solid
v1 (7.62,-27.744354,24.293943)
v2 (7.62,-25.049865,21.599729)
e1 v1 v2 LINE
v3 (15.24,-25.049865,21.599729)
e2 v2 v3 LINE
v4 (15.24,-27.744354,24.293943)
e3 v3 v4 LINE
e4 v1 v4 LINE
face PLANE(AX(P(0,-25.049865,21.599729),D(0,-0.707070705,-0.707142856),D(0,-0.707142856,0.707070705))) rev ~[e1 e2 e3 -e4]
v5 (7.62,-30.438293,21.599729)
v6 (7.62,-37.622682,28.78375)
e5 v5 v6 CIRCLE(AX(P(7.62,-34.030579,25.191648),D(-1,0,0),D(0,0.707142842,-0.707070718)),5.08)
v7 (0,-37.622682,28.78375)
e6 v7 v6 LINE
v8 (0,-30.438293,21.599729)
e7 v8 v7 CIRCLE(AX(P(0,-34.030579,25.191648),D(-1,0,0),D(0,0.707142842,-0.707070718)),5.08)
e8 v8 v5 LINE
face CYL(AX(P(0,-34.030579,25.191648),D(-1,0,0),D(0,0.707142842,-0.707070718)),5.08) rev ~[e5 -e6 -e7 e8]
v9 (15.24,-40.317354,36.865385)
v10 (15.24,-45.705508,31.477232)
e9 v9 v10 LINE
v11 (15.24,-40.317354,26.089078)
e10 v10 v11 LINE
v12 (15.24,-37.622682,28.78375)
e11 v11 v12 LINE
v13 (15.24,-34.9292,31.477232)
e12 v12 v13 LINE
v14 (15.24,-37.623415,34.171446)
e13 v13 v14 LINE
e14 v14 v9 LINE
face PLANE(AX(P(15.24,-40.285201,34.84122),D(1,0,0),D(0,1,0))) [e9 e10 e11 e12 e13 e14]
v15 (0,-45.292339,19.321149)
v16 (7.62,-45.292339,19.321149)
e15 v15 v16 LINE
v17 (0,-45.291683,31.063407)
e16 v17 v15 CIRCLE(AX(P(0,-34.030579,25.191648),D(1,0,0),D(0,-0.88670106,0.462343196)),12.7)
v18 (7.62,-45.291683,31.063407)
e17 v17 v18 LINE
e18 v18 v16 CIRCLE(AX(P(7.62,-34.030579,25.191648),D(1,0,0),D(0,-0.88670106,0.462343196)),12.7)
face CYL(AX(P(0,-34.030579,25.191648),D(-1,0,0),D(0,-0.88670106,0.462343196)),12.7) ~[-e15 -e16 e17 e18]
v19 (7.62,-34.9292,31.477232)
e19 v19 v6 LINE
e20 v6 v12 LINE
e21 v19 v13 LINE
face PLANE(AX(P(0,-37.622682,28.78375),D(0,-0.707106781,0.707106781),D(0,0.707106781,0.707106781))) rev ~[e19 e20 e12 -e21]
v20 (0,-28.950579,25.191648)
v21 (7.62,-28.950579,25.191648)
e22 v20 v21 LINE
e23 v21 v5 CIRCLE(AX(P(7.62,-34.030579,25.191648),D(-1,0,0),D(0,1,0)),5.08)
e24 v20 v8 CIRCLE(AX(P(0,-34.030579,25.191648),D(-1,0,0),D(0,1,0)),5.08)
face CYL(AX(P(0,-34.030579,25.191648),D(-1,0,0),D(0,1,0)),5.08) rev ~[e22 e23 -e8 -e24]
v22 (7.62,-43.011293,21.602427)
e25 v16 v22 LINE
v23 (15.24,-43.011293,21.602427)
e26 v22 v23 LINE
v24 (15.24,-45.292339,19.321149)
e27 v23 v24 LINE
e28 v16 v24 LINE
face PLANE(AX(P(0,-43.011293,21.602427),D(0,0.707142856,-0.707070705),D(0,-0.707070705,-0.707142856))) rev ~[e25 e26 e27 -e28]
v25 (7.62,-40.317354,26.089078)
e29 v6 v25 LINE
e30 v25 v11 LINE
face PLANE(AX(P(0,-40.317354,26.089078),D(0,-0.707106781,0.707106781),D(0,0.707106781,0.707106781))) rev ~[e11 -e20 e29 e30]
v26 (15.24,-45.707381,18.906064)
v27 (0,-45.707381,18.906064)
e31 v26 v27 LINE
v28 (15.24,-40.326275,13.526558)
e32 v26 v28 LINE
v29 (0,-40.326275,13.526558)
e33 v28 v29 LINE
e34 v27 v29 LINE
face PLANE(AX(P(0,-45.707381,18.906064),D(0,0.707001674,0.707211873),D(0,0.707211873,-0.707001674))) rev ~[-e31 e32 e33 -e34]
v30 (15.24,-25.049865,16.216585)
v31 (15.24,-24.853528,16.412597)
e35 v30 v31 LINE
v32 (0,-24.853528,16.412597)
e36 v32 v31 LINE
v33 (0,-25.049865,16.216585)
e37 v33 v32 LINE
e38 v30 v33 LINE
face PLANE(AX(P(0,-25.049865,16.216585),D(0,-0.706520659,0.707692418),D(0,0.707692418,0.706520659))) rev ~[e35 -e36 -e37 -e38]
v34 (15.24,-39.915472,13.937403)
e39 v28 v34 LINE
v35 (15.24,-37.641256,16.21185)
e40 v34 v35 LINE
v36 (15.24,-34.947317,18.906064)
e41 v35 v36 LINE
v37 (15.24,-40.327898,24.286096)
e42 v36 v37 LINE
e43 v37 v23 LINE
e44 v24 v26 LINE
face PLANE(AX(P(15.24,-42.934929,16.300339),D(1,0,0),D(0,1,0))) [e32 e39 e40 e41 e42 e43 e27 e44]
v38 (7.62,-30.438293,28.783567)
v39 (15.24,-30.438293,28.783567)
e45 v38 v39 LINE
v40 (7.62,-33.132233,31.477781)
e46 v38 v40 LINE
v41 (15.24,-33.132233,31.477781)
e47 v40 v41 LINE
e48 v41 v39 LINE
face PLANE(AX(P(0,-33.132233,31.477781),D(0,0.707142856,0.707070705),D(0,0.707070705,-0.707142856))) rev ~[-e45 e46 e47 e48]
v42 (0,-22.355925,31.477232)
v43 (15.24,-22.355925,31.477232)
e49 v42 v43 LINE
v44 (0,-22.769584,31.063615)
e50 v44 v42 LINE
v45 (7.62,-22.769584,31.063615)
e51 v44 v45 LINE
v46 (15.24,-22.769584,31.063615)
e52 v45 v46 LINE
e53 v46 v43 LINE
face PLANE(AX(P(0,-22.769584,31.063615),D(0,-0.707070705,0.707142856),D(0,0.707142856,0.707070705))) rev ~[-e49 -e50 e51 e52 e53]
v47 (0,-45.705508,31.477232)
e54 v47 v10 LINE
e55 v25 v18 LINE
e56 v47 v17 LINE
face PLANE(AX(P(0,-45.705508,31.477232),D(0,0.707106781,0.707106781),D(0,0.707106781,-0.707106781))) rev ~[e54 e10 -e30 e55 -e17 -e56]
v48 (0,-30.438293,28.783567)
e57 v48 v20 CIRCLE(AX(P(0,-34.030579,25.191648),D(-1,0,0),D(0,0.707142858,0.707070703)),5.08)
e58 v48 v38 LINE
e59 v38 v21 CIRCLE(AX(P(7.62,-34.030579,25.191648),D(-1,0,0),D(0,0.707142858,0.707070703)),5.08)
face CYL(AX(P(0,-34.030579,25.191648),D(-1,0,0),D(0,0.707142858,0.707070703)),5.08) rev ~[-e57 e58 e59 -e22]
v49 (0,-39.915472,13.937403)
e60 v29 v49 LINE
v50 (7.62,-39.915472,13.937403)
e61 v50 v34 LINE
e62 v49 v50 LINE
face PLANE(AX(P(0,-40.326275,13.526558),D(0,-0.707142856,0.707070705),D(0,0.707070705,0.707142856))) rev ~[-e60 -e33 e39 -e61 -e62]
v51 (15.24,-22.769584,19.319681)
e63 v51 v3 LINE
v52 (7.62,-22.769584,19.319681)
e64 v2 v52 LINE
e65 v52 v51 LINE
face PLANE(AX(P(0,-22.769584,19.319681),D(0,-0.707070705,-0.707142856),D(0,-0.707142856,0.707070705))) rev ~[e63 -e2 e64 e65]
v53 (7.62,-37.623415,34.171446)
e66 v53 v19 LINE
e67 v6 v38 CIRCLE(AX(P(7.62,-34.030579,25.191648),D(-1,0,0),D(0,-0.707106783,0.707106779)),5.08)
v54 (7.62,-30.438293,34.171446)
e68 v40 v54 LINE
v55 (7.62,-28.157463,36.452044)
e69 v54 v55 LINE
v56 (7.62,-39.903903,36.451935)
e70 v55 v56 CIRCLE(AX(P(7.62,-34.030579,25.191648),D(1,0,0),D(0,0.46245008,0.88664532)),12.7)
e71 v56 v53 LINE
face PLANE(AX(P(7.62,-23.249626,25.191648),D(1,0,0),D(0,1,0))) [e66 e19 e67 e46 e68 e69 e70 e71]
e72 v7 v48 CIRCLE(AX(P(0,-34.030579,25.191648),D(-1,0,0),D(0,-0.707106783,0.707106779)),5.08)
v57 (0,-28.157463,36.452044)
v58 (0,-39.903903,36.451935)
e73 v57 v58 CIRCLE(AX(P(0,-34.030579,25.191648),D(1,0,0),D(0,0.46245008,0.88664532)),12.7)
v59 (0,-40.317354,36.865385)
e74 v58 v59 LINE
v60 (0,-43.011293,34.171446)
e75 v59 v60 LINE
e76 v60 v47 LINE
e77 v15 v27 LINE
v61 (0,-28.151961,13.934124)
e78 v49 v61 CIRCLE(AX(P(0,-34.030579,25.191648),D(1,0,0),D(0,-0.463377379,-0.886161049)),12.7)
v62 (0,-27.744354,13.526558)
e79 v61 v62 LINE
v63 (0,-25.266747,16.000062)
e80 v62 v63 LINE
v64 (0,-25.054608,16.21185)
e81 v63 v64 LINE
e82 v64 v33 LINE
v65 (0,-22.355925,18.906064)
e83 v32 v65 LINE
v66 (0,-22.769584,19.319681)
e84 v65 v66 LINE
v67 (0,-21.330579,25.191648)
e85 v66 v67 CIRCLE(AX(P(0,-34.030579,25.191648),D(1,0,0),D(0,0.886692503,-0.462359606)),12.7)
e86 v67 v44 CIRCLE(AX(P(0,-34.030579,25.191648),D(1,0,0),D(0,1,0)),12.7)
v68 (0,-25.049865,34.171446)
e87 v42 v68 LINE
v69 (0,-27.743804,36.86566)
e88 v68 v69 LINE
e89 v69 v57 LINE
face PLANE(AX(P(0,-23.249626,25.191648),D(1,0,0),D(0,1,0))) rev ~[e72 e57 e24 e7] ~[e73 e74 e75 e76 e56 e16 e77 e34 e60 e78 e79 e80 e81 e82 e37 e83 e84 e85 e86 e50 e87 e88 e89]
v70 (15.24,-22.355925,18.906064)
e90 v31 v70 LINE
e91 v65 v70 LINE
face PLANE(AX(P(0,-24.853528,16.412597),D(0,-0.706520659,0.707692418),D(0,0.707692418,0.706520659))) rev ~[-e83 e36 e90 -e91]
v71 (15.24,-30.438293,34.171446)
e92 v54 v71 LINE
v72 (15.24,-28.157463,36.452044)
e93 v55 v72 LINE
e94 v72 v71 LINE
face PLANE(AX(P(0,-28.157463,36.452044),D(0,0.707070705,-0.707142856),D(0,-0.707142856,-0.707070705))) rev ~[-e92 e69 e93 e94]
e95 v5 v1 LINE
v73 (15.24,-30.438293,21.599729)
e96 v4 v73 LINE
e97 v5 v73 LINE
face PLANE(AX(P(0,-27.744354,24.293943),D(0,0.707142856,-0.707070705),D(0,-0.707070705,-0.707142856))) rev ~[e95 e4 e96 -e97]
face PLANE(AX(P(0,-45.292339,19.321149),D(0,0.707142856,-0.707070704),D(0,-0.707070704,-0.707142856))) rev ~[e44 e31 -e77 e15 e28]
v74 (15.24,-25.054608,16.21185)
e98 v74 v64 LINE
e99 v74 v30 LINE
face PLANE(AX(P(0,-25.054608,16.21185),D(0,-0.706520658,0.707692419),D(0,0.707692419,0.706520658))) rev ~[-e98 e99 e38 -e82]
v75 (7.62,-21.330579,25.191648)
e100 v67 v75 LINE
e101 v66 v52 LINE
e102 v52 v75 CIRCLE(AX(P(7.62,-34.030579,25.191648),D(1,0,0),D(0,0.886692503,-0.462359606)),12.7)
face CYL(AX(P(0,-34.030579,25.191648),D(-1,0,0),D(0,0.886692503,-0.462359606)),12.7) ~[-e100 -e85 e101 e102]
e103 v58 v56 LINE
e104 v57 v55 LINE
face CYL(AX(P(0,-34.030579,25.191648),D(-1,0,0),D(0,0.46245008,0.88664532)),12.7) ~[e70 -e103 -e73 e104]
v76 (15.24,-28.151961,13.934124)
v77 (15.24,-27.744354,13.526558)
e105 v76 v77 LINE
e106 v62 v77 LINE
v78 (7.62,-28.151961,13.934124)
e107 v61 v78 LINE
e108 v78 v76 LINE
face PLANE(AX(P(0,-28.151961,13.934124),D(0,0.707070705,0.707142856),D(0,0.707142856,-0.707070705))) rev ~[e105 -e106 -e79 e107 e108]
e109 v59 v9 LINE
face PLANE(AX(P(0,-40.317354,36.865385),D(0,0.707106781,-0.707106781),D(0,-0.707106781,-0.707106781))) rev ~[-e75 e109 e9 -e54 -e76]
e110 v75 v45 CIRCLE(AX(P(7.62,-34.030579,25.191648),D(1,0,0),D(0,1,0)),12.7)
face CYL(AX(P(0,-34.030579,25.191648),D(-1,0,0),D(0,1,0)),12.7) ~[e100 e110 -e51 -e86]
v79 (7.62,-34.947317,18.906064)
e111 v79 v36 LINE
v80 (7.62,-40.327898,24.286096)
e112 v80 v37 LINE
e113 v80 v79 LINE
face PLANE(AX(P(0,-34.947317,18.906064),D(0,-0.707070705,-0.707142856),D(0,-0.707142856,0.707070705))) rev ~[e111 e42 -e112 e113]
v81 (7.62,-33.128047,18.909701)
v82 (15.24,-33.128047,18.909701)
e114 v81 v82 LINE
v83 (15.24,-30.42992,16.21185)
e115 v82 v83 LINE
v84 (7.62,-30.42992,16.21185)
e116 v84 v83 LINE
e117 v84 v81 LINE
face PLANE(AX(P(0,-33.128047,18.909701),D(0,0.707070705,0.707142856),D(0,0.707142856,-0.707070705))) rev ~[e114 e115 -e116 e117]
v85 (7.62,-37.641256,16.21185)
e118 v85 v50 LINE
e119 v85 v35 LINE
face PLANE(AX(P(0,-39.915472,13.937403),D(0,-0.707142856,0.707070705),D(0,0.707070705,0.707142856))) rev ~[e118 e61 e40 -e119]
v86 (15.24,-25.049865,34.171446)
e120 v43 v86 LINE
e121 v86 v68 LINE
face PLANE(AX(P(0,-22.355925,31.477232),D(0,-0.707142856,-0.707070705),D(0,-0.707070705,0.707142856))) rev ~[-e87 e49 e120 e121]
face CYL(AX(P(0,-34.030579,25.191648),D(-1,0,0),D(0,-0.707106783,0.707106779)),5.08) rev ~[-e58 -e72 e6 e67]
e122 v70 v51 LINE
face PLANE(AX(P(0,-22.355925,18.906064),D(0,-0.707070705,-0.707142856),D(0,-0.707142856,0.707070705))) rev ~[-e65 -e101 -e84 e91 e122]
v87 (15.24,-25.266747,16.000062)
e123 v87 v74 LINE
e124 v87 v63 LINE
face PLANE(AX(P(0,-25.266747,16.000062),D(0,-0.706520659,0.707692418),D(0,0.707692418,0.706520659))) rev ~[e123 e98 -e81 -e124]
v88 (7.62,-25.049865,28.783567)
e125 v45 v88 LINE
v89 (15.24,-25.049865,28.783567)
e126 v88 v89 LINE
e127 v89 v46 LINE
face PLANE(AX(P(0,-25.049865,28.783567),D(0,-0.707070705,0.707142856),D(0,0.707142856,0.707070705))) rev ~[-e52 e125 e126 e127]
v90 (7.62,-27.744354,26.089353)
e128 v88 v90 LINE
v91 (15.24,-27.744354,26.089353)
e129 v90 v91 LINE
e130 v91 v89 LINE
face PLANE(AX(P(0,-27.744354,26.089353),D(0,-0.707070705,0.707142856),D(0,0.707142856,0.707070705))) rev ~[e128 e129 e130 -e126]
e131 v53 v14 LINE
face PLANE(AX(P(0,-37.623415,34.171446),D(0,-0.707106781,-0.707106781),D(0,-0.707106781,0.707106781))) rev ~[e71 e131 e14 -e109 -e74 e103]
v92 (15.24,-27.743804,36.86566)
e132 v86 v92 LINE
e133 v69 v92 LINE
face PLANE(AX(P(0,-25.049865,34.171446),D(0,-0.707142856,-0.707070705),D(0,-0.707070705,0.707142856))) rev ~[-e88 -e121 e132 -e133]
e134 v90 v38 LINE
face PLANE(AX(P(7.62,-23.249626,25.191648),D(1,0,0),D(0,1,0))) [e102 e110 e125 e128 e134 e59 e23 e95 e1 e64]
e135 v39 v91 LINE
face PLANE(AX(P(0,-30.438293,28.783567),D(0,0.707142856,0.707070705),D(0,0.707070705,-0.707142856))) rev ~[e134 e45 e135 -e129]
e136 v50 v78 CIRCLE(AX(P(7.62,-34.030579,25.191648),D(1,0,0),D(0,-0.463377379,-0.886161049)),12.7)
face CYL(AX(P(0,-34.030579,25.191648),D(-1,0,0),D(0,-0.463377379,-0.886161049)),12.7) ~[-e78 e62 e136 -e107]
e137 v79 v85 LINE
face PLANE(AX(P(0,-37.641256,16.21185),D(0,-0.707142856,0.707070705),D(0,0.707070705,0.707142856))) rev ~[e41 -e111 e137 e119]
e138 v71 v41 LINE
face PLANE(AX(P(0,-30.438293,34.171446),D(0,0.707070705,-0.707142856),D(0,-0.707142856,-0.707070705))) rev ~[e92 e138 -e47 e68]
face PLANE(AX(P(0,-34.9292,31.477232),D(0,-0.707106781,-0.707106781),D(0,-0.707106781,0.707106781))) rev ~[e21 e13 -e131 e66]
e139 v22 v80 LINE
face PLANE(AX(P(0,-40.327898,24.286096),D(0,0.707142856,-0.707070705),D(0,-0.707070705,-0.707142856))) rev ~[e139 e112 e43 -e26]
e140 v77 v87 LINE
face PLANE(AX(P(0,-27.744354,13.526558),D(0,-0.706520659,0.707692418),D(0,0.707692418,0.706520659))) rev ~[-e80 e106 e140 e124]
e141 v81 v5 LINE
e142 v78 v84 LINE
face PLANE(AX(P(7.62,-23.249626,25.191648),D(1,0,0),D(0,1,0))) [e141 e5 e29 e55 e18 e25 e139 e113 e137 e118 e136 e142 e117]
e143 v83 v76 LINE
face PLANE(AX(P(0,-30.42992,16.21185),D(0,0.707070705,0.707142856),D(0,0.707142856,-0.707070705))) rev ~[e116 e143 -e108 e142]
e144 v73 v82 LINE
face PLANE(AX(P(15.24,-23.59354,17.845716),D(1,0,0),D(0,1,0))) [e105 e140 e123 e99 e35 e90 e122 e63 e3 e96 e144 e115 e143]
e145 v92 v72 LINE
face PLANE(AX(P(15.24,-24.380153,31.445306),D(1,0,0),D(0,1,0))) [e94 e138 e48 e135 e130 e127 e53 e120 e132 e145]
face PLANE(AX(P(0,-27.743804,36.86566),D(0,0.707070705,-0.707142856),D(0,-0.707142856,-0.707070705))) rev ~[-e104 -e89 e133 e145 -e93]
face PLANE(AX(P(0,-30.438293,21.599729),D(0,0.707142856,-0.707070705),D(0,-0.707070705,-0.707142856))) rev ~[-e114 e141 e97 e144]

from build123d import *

# Parameters (mm, degrees)
F1_DEPTH = 7.62
F2_DEPTH = 15.24


with BuildPart() as f1:
    # F0 (on Right) → F1 (new body)
    with BuildSketch(Plane.YZ):
        with BuildLine():
            ThreePointArc((-22.7695842606, 19.3196809519), (-21.6955753206, 22.1687878641), (-21.330579045, 25.1916479534))
            ThreePointArc((-21.330579045, 25.1916479534), (-21.6955753206, 28.2145080427), (-22.7695842606, 31.063614955))
            Line((-22.7695842606, 31.063614955), (-25.0498647737, 28.7835671044))
            Line((-25.0498647737, 28.7835671044), (-25.0498647737, 21.5997288025))
            Line((-25.0498647737, 21.5997288025), (-22.7695842606, 19.3196809519))
        make_face()
        with BuildLine():
            Line((-25.0498647737, 28.7835671044), (-22.7695842606, 31.063614955))
            ThreePointArc((-22.7695842606, 31.063614955), (-23.7911283922, 32.7045468833), (-25.0498647737, 34.1714459009))
            Line((-25.0498647737, 34.1714459009), (-25.0498647737, 28.7835671044))
        make_face()
        with BuildLine():
            ThreePointArc((-24.8535283353, 16.4125967363), (-23.7086988595, 17.7924054626), (-22.7695842606, 19.3196809519))
            Line((-22.7695842606, 19.3196809519), (-25.0498647737, 21.5997288025))
            Line((-25.0498647737, 21.5997288025), (-25.0498647737, 16.2165853811))
            Line((-25.0498647737, 16.2165853811), (-24.8535283353, 16.4125967363))
        make_face()
        with BuildLine():
            Line((-30.4382933645, 34.1714459009), (-25.0498647737, 34.1714459009))
            ThreePointArc((-25.0498647737, 34.1714459009), (-26.5166353453, 35.4303319547), (-28.1574630291, 36.4520435177))
            Line((-28.1574630291, 36.4520435177), (-30.4382933645, 34.1714459009))
        make_face()
        Polygon((-25.0498647737, 28.7835671044), (-25.0498647737, 34.1714459009), (-30.4382933645, 34.1714459009), (-33.1322327207, 31.4777814138), (-30.4382933285, 28.7835671244), (-27.7443539522, 26.089352851), align=None)
        with BuildLine():
            Line((-25.0498647737, 21.5997288025), (-25.0498647737, 28.7835671044))
            Line((-25.0498647737, 28.7835671044), (-27.7443539522, 26.089352851))
            Line((-27.7443539522, 26.089352851), (-30.4382933285, 28.7835671244))
            ThreePointArc((-30.4382933285, 28.7835671244), (-29.3372214281, 27.1355600605), (-28.950579045, 25.1916479534))
            ThreePointArc((-28.950579045, 25.1916479534), (-29.3372214494, 23.2477357949), (-30.4382934071, 21.5997287037))
            Line((-30.4382934071, 21.5997287037), (-27.7443539522, 24.2939430558))
            Line((-27.7443539522, 24.2939430558), (-25.0498647737, 21.5997288025))
        make_face()
        Polygon((-25.0498647737, 16.2165853811), (-25.0498647737, 21.5997288025), (-27.7443539522, 24.2939430558), (-30.4382934071, 21.5997287037), (-33.1280466566, 18.9097009843), (-30.4299203819, 16.2118500059), (-25.0546080025, 16.2118500059), align=None)
        with BuildLine():
            Line((-30.4382933645, 34.1714459009), (-28.1574630291, 36.4520435177))
            ThreePointArc((-28.1574630291, 36.4520435177), (-34.0306965605, 37.8916479529), (-39.9039034491, 36.4519348256))
            Line((-39.9039034491, 36.4519348256), (-37.6234145244, 34.1714459009))
            Line((-37.6234145244, 34.1714459009), (-30.4382933645, 34.1714459009))
        make_face()
        with BuildLine():
            Line((-33.1322327207, 31.4777814138), (-30.4382933645, 34.1714459009))
            Line((-30.4382933645, 34.1714459009), (-37.6234145244, 34.1714459009))
            Line((-37.6234145244, 34.1714459009), (-34.9292002593, 31.4772316359))
            Line((-34.9292002593, 31.4772316359), (-37.6226815049, 28.7837503904))
            ThreePointArc((-37.6226815049, 28.7837503904), (-34.0304494597, 30.2716479518), (-30.4382933285, 28.7835671244))
            Line((-30.4382933285, 28.7835671244), (-33.1322327207, 31.4777814138))
        make_face()
        with BuildLine():
            Line((-37.6234145244, 34.1714459009), (-39.9039034491, 36.4519348256))
            ThreePointArc((-39.9039034491, 36.4519348256), (-41.5446174849, 35.4302624263), (-43.0112933162, 34.1714459009))
            Line((-43.0112933162, 34.1714459009), (-37.6234145244, 34.1714459009))
        make_face()
        Polygon((-34.9292002593, 31.4772316359), (-37.6234145244, 34.1714459009), (-43.0112933162, 34.1714459009), (-43.0112933162, 28.7830173475), (-40.317353932, 26.0890779633), (-37.6226815049, 28.7837503904), align=None)
        with BuildLine():
            ThreePointArc((-28.1519614983, 13.9341235479), (-26.6368414576, 14.865823798), (-25.2667473216, 16.0000619355))
            Line((-25.2667473216, 16.0000619355), (-25.0546080025, 16.2118500059))
            Line((-25.0546080025, 16.2118500059), (-30.4299203819, 16.2118500059))
            Line((-30.4299203819, 16.2118500059), (-28.1519614983, 13.9341235479))
        make_face()
        with BuildLine():
            Line((-33.1280466566, 18.9097009843), (-30.4382934071, 21.5997287037))
            ThreePointArc((-30.4382934071, 21.5997287037), (-37.6225898895, 21.5994539034), (-37.6226815049, 28.7837503904))
            Line((-37.6226815049, 28.7837503904), (-40.317353932, 26.0890779633))
            Line((-40.317353932, 26.0890779633), (-43.0112933162, 28.7830173475))
            Line((-43.0112933162, 28.7830173475), (-43.0112933162, 21.6024270559))
            Line((-43.0112933162, 21.6024270559), (-40.3278979877, 24.2860962057))
            Line((-40.3278979877, 24.2860962057), (-34.9473170757, 18.9060642873))
            Line((-34.9473170757, 18.9060642873), (-37.64125646, 16.2118500059))
            Line((-37.64125646, 16.2118500059), (-30.4299203819, 16.2118500059))
            Line((-30.4299203819, 16.2118500059), (-33.1280466566, 18.9097009843))
        make_face()
        with BuildLine():
            Line((-43.0112933162, 28.7830173475), (-43.0112933162, 34.1714459009))
            ThreePointArc((-43.0112933162, 34.1714459009), (-44.2700992213, 32.7044521275), (-45.2916825052, 31.0634065365))
            Line((-45.2916825052, 31.0634065365), (-43.0112933162, 28.7830173475))
        make_face()
        with BuildLine():
            ThreePointArc((-39.9154717637, 13.9374026349), (-34.034119179, 12.4916484468), (-28.1519614983, 13.9341235479))
            Line((-28.1519614983, 13.9341235479), (-30.4299203819, 16.2118500059))
            Line((-30.4299203819, 16.2118500059), (-37.64125646, 16.2118500059))
            Line((-37.64125646, 16.2118500059), (-39.9154717637, 13.9374026349))
        make_face()
        with BuildLine():
            Line((-43.0112933162, 28.7830173475), (-45.2916825052, 31.0634065365))
            ThreePointArc((-45.2916825052, 31.0634065365), (-46.7305790251, 25.1923579991), (-45.2923390044, 19.3211486035))
            Line((-45.2923390044, 19.3211486035), (-43.0112933162, 21.6024270559))
            Line((-43.0112933162, 21.6024270559), (-43.0112933162, 28.7830173475))
        make_face()
        with BuildLine():
            Line((-40.3262748881, 13.526557591), (-39.9154717637, 13.9374026349))
            ThreePointArc((-39.9154717637, 13.9374026349), (-41.5498772506, 14.9568956607), (-43.0112933162, 16.2118500059))
            ThreePointArc((-43.0112933162, 16.2118500059), (-44.2705192395, 17.6794162735), (-45.2923390044, 19.3211486035))
            Line((-45.2923390044, 19.3211486035), (-45.7073809685, 18.9060642873))
            Line((-45.7073809685, 18.9060642873), (-40.3262748881, 13.526557591))
        make_face()
        with BuildLine():
            ThreePointArc((-43.0112933162, 16.2118500059), (-41.5498772506, 14.9568956607), (-39.9154717637, 13.9374026349))
            Line((-39.9154717637, 13.9374026349), (-37.64125646, 16.2118500059))
            Line((-37.64125646, 16.2118500059), (-43.0112933162, 16.2118500059))
        make_face()
        Polygon((-43.0112933162, 16.2118500059), (-37.64125646, 16.2118500059), (-34.9473170757, 18.9060642873), (-40.3278979877, 24.2860962057), (-43.0112933162, 21.6024270559), align=None)
        with BuildLine():
            Line((-43.0112933162, 21.6024270559), (-45.2923390044, 19.3211486035))
            ThreePointArc((-45.2923390044, 19.3211486035), (-44.2705192395, 17.6794162735), (-43.0112933162, 16.2118500059))
            Line((-43.0112933162, 16.2118500059), (-43.0112933162, 21.6024270559))
        make_face()
    extrude(amount=F1_DEPTH)

    # F0 (on Right) → F2 (join)
    with BuildSketch(Plane.YZ):
        with BuildLine():
            Line((-25.0498647737, 28.7835671044), (-22.7695842606, 31.063614955))
            ThreePointArc((-22.7695842606, 31.063614955), (-23.7911283922, 32.7045468833), (-25.0498647737, 34.1714459009))
            Line((-25.0498647737, 34.1714459009), (-25.0498647737, 28.7835671044))
        make_face()
        with BuildLine():
            ThreePointArc((-25.0498647737, 34.1714459009), (-23.7911283922, 32.7045468833), (-22.7695842606, 31.063614955))
            Line((-22.7695842606, 31.063614955), (-22.3559253895, 31.4772316195))
            Line((-22.3559253895, 31.4772316195), (-25.0498647737, 34.1714459009))
        make_face()
        with BuildLine():
            Line((-22.3559253895, 18.9060642873), (-22.7695842606, 19.3196809519))
            ThreePointArc((-22.7695842606, 19.3196809519), (-23.7086988595, 17.7924054626), (-24.8535283353, 16.4125967363))
            Line((-24.8535283353, 16.4125967363), (-22.3559253895, 18.9060642873))
        make_face()
        with BuildLine():
            ThreePointArc((-24.8535283353, 16.4125967363), (-23.7086988595, 17.7924054626), (-22.7695842606, 19.3196809519))
            Line((-22.7695842606, 19.3196809519), (-25.0498647737, 21.5997288025))
            Line((-25.0498647737, 21.5997288025), (-25.0498647737, 16.2165853811))
            Line((-25.0498647737, 16.2165853811), (-24.8535283353, 16.4125967363))
        make_face()
        with BuildLine():
            Line((-30.4382933645, 34.1714459009), (-25.0498647737, 34.1714459009))
            ThreePointArc((-25.0498647737, 34.1714459009), (-26.5166353453, 35.4303319547), (-28.1574630291, 36.4520435177))
            Line((-28.1574630291, 36.4520435177), (-30.4382933645, 34.1714459009))
        make_face()
        Polygon((-25.0498647737, 28.7835671044), (-25.0498647737, 34.1714459009), (-30.4382933645, 34.1714459009), (-33.1322327207, 31.4777814138), (-30.4382933285, 28.7835671244), (-27.7443539522, 26.089352851), align=None)
        with BuildLine():
            ThreePointArc((-28.1574630291, 36.4520435177), (-26.5166353453, 35.4303319547), (-25.0498647737, 34.1714459009))
            Line((-25.0498647737, 34.1714459009), (-27.743804158, 36.8656601823))
            Line((-27.743804158, 36.8656601823), (-28.1574630291, 36.4520435177))
        make_face()
        Polygon((-25.0498647737, 16.2165853811), (-25.0498647737, 21.5997288025), (-27.7443539522, 24.2939430558), (-30.4382934071, 21.5997287037), (-33.1280466566, 18.9097009843), (-30.4299203819, 16.2118500059), (-25.0546080025, 16.2118500059), align=None)
        with BuildLine():
            Line((-37.6234145244, 34.1714459009), (-39.9039034491, 36.4519348256))
            ThreePointArc((-39.9039034491, 36.4519348256), (-41.5446174849, 35.4302624263), (-43.0112933162, 34.1714459009))
            Line((-43.0112933162, 34.1714459009), (-37.6234145244, 34.1714459009))
        make_face()
        with BuildLine():
            ThreePointArc((-43.0112933162, 34.1714459009), (-41.5446174849, 35.4302624263), (-39.9039034491, 36.4519348256))
            Line((-39.9039034491, 36.4519348256), (-40.317353932, 36.8653853085))
            Line((-40.317353932, 36.8653853085), (-43.0112933279, 34.1714459126))
        make_face()
        Polygon((-34.9292002593, 31.4772316359), (-37.6234145244, 34.1714459009), (-43.0112933162, 34.1714459009), (-43.0112933162, 28.7830173475), (-40.317353932, 26.0890779633), (-37.6226815049, 28.7837503904), align=None)
        with BuildLine():
            Line((-27.7443539522, 13.526557591), (-25.2667473216, 16.0000619355))
            ThreePointArc((-25.2667473216, 16.0000619355), (-26.6368414576, 14.865823798), (-28.1519614983, 13.9341235479))
            Line((-28.1519614983, 13.9341235479), (-27.7443539522, 13.526557591))
        make_face()
        with BuildLine():
            ThreePointArc((-28.1519614983, 13.9341235479), (-26.6368414576, 14.865823798), (-25.2667473216, 16.0000619355))
            Line((-25.2667473216, 16.0000619355), (-25.0546080025, 16.2118500059))
            Line((-25.0546080025, 16.2118500059), (-30.4299203819, 16.2118500059))
            Line((-30.4299203819, 16.2118500059), (-28.1519614983, 13.9341235479))
        make_face()
        with BuildLine():
            Line((-43.0112933162, 28.7830173475), (-43.0112933162, 34.1714459009))
            ThreePointArc((-43.0112933162, 34.1714459009), (-44.2700992213, 32.7044521275), (-45.2916825052, 31.0634065365))
            Line((-45.2916825052, 31.0634065365), (-43.0112933162, 28.7830173475))
        make_face()
        with BuildLine():
            ThreePointArc((-45.2916825052, 31.0634065365), (-44.2700992213, 32.7044521275), (-43.0112933162, 34.1714459009))
            Line((-43.0112933279, 34.1714459126), (-45.7055076046, 31.4772316359))
            Line((-45.7055076046, 31.4772316359), (-45.2916825052, 31.0634065365))
        make_face()
        with BuildLine():
            Line((-40.3262748881, 13.526557591), (-39.9154717637, 13.9374026349))
            ThreePointArc((-39.9154717637, 13.9374026349), (-41.5498772506, 14.9568956607), (-43.0112933162, 16.2118500059))
            ThreePointArc((-43.0112933162, 16.2118500059), (-44.2705192395, 17.6794162735), (-45.2923390044, 19.3211486035))
            Line((-45.2923390044, 19.3211486035), (-45.7073809685, 18.9060642873))
            Line((-45.7073809685, 18.9060642873), (-40.3262748881, 13.526557591))
        make_face()
        with BuildLine():
            ThreePointArc((-43.0112933162, 16.2118500059), (-41.5498772506, 14.9568956607), (-39.9154717637, 13.9374026349))
            Line((-39.9154717637, 13.9374026349), (-37.64125646, 16.2118500059))
            Line((-37.64125646, 16.2118500059), (-43.0112933162, 16.2118500059))
        make_face()
        Polygon((-43.0112933162, 16.2118500059), (-37.64125646, 16.2118500059), (-34.9473170757, 18.9060642873), (-40.3278979877, 24.2860962057), (-43.0112933162, 21.6024270559), align=None)
        with BuildLine():
            Line((-43.0112933162, 21.6024270559), (-45.2923390044, 19.3211486035))
            ThreePointArc((-45.2923390044, 19.3211486035), (-44.2705192395, 17.6794162735), (-43.0112933162, 16.2118500059))
            Line((-43.0112933162, 16.2118500059), (-43.0112933162, 21.6024270559))
        make_face()
    extrude(amount=F2_DEPTH)


solid = f1.part
